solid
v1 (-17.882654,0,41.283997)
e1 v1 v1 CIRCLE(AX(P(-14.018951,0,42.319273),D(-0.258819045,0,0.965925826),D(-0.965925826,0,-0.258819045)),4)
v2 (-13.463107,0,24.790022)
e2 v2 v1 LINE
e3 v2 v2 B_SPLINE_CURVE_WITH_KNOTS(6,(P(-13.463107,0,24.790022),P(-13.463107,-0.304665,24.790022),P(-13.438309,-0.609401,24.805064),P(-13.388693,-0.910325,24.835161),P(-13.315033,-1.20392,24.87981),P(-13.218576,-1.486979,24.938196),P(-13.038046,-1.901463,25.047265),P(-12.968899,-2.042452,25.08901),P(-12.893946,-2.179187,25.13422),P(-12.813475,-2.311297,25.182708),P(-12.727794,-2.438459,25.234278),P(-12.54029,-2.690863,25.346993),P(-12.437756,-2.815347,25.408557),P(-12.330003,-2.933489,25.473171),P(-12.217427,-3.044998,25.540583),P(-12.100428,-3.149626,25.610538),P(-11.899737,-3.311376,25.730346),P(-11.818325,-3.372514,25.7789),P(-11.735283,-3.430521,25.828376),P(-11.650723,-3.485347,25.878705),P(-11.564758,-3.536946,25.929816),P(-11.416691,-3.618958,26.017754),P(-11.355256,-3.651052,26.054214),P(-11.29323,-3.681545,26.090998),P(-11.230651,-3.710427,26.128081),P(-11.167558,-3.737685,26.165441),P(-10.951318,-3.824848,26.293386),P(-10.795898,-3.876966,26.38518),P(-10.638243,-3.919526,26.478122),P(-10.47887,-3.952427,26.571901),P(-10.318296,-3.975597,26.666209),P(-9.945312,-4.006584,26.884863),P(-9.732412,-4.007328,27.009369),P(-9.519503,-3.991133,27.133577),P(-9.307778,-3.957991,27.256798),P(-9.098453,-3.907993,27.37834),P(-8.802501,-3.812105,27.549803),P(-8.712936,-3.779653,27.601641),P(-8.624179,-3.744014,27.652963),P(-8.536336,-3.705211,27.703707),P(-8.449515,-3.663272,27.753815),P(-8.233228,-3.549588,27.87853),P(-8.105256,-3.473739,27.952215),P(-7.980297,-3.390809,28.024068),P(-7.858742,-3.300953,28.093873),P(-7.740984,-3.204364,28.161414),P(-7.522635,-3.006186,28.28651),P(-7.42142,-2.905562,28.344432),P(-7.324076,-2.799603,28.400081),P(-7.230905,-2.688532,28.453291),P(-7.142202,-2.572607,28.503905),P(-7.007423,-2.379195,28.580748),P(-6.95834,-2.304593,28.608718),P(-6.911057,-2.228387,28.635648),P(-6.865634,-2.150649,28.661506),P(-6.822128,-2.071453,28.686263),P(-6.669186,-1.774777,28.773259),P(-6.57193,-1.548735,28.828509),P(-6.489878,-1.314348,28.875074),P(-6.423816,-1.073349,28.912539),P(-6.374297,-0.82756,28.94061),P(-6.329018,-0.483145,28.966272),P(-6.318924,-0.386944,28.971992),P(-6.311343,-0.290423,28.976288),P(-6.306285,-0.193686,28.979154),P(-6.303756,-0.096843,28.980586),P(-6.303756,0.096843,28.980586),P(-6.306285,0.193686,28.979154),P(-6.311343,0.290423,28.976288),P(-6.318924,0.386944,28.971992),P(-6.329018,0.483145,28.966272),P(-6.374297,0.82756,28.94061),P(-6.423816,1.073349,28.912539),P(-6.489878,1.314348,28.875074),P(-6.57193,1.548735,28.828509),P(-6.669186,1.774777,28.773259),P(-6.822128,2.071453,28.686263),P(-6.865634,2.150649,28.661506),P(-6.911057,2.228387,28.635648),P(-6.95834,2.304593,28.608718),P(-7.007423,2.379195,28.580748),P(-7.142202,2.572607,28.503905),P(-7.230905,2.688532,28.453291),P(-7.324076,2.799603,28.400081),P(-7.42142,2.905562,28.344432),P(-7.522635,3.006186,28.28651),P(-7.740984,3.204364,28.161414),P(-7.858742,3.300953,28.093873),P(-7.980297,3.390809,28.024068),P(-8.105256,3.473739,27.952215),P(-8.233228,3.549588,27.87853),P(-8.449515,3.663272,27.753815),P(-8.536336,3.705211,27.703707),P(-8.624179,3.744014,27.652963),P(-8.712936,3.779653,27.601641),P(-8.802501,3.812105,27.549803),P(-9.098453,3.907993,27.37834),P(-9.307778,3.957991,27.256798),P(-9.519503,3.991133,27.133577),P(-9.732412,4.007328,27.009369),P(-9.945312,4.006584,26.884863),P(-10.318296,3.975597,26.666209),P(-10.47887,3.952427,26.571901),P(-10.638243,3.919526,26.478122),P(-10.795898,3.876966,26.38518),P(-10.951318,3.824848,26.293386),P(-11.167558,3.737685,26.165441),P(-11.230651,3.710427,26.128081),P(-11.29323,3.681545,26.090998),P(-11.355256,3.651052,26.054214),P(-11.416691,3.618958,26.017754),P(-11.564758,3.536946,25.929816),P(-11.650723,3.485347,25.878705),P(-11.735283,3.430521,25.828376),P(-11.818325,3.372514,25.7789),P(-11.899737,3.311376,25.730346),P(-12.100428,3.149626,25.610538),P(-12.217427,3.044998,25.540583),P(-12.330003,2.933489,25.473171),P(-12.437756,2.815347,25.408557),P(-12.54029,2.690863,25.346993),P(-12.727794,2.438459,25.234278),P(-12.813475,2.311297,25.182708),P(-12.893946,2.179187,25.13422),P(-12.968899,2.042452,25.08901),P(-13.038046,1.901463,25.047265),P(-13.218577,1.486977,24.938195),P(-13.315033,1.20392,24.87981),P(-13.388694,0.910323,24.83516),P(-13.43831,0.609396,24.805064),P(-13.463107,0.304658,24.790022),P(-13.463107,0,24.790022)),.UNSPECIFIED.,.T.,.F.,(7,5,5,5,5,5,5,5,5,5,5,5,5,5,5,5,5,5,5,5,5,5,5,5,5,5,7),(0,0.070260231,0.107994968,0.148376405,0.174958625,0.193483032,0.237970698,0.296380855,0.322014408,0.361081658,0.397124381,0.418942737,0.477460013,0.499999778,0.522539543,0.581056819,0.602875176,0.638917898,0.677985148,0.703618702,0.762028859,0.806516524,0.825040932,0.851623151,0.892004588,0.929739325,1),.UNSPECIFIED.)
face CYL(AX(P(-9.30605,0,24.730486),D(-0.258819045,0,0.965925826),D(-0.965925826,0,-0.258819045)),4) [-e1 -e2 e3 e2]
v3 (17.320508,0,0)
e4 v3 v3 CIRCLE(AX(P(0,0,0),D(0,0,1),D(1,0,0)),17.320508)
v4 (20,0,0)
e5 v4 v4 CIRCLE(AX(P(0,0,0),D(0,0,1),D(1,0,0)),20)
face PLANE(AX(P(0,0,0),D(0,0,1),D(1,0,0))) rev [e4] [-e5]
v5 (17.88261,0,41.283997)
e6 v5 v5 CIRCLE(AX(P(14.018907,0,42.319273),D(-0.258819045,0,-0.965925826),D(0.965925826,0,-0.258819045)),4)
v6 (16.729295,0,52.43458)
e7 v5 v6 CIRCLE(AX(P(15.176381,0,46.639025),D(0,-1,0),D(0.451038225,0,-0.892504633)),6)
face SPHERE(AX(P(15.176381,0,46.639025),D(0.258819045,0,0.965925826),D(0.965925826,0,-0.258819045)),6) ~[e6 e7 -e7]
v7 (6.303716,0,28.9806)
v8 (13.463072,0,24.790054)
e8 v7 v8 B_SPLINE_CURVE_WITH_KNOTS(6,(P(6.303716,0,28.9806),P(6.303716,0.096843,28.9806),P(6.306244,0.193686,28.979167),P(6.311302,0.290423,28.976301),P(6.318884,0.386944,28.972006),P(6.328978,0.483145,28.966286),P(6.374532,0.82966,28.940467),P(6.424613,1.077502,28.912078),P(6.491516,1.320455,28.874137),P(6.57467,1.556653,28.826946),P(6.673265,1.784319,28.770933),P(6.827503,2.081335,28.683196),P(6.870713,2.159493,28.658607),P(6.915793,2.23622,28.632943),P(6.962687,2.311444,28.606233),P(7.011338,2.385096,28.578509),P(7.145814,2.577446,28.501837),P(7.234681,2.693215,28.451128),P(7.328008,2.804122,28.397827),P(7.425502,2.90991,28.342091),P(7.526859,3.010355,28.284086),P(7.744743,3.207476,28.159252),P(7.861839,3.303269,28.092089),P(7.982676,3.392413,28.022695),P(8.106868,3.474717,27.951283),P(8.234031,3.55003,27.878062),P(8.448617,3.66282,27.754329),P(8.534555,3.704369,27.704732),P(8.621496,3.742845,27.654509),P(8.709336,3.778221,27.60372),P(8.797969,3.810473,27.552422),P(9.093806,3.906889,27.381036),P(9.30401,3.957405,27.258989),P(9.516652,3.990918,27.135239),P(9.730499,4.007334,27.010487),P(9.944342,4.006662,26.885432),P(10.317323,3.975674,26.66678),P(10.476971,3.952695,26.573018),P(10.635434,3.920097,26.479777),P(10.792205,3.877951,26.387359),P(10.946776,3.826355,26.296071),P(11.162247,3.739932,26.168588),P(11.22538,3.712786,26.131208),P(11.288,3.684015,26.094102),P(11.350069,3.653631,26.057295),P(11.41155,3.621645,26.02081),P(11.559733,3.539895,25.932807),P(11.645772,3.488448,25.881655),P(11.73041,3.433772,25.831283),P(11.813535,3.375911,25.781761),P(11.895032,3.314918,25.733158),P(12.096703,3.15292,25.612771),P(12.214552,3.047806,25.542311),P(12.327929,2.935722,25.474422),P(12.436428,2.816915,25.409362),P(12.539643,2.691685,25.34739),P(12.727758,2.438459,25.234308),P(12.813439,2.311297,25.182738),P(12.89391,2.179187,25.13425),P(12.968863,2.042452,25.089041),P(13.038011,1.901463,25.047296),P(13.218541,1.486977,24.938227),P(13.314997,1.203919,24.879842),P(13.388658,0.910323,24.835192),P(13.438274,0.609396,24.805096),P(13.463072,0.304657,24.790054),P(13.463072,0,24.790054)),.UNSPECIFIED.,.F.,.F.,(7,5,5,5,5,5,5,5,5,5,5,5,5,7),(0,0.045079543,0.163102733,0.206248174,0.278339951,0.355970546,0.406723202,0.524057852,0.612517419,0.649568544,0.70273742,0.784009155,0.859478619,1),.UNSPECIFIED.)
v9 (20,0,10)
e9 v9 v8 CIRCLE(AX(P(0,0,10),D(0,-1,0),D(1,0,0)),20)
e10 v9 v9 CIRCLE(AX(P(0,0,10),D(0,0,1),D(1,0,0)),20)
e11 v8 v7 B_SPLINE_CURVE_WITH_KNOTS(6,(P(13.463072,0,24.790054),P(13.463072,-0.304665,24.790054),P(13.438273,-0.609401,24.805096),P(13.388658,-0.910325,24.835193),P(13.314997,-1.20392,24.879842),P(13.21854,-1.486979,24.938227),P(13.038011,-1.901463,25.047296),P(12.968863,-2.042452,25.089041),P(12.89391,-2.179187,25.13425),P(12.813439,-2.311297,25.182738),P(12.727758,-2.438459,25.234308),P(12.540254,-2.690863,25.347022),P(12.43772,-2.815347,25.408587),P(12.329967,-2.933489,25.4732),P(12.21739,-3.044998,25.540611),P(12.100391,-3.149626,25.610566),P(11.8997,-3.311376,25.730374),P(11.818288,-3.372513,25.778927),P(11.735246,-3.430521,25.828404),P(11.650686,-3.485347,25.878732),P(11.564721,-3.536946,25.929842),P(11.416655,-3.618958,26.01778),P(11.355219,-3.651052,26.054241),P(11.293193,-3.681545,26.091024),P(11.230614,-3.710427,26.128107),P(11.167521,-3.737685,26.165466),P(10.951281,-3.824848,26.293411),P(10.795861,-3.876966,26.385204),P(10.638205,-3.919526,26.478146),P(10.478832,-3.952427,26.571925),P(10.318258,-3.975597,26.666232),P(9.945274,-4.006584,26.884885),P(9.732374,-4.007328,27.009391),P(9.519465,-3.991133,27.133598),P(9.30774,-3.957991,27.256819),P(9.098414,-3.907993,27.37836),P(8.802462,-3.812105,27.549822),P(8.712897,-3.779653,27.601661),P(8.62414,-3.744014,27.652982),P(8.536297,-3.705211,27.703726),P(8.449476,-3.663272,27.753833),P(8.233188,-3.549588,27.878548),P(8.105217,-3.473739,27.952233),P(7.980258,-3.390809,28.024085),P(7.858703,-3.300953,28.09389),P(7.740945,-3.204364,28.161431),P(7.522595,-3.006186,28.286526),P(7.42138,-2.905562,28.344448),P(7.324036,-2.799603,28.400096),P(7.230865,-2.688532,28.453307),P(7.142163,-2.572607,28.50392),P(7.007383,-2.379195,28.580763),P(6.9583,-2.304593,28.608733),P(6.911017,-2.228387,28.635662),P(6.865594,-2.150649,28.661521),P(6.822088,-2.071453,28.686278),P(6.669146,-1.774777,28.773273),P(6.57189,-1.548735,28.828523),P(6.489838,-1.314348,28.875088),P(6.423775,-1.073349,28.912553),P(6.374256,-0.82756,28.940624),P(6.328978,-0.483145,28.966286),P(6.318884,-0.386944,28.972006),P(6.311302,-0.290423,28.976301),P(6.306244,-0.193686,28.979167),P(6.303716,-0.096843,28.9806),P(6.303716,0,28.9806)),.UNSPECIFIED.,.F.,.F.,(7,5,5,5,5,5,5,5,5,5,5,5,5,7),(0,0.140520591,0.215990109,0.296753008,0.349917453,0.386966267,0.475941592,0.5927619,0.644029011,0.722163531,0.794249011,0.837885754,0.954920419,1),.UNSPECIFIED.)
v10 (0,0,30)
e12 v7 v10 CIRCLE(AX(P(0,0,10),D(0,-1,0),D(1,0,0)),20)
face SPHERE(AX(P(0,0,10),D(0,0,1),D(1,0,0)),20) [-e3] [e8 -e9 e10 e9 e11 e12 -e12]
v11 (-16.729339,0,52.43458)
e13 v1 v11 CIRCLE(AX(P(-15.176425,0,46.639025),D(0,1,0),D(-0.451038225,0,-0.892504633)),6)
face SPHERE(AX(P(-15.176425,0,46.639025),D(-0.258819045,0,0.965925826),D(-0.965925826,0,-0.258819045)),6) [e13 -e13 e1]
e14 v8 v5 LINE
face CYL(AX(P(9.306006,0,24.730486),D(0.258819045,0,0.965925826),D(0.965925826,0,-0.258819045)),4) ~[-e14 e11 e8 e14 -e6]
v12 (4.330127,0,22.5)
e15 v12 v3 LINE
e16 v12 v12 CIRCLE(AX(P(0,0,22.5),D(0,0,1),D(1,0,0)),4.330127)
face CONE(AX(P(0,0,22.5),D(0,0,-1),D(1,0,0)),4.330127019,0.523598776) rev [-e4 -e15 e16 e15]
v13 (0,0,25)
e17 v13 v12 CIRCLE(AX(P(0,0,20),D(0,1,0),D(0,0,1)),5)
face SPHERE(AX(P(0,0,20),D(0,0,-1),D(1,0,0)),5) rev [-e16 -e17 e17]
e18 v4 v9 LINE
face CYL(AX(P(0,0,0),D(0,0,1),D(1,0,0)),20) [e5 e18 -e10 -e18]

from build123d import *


# Not quite as in the source:
# - a pattern or mirror of a feature is missing from the dataset's text; its kind, count and spacing are read off the source's solid


with BuildPart() as f1:
    # F0 (on Front) → F1 (revolve)
    with BuildSketch(Plane.XZ):
        with BuildLine():
            ThreePointArc((0, 25), (2.5, 24.3301270189), (4.3301270189, 22.5))
            Line((4.3301270189, 22.5), (17.3205080757, 0))
            Line((17.3205080757, 0), (20, 0))
            Line((20, 0), (20, 10))
            ThreePointArc((20, 10), (14.1421356237, 24.1421356237), (0, 30))
            Line((0, 30), (0, 25))
        make_face()
    revolve(axis=Axis((0, 0, 15), (0, 0, 1)))

    # F2 (on Front) → F3 (revolve)
    with BuildSketch(Plane.XZ):
        with BuildLine():
            Line((15.1763809021, 46.6390246015), (9.3060056246, 24.7304858066))
            Line((9.3060056246, 24.7304858066), (13.1697089298, 23.6952096262))
            Line((13.1697089298, 23.6952096262), (17.8826102498, 41.2839968035))
            ThreePointArc((17.8826102498, 41.2839968035), (21.1445422637, 47.2563170454), (16.7292951727, 52.4345795592))
            Line((16.7292951727, 52.4345795592), (15.1763809021, 46.6390246015))
        make_face()
    f3 = revolve(axis=Axis((12.2411932633, 0, 35.684755204), (-0.2588190451, 0, -0.9659258263)))

    # F3_copies: F3 across plane
    add(f3.mirror(Plane(origin=(-2.2e-05, 0, 0), x_dir=(0, 0, -1), z_dir=(-1, 0, 0))))


solid = f1.part
